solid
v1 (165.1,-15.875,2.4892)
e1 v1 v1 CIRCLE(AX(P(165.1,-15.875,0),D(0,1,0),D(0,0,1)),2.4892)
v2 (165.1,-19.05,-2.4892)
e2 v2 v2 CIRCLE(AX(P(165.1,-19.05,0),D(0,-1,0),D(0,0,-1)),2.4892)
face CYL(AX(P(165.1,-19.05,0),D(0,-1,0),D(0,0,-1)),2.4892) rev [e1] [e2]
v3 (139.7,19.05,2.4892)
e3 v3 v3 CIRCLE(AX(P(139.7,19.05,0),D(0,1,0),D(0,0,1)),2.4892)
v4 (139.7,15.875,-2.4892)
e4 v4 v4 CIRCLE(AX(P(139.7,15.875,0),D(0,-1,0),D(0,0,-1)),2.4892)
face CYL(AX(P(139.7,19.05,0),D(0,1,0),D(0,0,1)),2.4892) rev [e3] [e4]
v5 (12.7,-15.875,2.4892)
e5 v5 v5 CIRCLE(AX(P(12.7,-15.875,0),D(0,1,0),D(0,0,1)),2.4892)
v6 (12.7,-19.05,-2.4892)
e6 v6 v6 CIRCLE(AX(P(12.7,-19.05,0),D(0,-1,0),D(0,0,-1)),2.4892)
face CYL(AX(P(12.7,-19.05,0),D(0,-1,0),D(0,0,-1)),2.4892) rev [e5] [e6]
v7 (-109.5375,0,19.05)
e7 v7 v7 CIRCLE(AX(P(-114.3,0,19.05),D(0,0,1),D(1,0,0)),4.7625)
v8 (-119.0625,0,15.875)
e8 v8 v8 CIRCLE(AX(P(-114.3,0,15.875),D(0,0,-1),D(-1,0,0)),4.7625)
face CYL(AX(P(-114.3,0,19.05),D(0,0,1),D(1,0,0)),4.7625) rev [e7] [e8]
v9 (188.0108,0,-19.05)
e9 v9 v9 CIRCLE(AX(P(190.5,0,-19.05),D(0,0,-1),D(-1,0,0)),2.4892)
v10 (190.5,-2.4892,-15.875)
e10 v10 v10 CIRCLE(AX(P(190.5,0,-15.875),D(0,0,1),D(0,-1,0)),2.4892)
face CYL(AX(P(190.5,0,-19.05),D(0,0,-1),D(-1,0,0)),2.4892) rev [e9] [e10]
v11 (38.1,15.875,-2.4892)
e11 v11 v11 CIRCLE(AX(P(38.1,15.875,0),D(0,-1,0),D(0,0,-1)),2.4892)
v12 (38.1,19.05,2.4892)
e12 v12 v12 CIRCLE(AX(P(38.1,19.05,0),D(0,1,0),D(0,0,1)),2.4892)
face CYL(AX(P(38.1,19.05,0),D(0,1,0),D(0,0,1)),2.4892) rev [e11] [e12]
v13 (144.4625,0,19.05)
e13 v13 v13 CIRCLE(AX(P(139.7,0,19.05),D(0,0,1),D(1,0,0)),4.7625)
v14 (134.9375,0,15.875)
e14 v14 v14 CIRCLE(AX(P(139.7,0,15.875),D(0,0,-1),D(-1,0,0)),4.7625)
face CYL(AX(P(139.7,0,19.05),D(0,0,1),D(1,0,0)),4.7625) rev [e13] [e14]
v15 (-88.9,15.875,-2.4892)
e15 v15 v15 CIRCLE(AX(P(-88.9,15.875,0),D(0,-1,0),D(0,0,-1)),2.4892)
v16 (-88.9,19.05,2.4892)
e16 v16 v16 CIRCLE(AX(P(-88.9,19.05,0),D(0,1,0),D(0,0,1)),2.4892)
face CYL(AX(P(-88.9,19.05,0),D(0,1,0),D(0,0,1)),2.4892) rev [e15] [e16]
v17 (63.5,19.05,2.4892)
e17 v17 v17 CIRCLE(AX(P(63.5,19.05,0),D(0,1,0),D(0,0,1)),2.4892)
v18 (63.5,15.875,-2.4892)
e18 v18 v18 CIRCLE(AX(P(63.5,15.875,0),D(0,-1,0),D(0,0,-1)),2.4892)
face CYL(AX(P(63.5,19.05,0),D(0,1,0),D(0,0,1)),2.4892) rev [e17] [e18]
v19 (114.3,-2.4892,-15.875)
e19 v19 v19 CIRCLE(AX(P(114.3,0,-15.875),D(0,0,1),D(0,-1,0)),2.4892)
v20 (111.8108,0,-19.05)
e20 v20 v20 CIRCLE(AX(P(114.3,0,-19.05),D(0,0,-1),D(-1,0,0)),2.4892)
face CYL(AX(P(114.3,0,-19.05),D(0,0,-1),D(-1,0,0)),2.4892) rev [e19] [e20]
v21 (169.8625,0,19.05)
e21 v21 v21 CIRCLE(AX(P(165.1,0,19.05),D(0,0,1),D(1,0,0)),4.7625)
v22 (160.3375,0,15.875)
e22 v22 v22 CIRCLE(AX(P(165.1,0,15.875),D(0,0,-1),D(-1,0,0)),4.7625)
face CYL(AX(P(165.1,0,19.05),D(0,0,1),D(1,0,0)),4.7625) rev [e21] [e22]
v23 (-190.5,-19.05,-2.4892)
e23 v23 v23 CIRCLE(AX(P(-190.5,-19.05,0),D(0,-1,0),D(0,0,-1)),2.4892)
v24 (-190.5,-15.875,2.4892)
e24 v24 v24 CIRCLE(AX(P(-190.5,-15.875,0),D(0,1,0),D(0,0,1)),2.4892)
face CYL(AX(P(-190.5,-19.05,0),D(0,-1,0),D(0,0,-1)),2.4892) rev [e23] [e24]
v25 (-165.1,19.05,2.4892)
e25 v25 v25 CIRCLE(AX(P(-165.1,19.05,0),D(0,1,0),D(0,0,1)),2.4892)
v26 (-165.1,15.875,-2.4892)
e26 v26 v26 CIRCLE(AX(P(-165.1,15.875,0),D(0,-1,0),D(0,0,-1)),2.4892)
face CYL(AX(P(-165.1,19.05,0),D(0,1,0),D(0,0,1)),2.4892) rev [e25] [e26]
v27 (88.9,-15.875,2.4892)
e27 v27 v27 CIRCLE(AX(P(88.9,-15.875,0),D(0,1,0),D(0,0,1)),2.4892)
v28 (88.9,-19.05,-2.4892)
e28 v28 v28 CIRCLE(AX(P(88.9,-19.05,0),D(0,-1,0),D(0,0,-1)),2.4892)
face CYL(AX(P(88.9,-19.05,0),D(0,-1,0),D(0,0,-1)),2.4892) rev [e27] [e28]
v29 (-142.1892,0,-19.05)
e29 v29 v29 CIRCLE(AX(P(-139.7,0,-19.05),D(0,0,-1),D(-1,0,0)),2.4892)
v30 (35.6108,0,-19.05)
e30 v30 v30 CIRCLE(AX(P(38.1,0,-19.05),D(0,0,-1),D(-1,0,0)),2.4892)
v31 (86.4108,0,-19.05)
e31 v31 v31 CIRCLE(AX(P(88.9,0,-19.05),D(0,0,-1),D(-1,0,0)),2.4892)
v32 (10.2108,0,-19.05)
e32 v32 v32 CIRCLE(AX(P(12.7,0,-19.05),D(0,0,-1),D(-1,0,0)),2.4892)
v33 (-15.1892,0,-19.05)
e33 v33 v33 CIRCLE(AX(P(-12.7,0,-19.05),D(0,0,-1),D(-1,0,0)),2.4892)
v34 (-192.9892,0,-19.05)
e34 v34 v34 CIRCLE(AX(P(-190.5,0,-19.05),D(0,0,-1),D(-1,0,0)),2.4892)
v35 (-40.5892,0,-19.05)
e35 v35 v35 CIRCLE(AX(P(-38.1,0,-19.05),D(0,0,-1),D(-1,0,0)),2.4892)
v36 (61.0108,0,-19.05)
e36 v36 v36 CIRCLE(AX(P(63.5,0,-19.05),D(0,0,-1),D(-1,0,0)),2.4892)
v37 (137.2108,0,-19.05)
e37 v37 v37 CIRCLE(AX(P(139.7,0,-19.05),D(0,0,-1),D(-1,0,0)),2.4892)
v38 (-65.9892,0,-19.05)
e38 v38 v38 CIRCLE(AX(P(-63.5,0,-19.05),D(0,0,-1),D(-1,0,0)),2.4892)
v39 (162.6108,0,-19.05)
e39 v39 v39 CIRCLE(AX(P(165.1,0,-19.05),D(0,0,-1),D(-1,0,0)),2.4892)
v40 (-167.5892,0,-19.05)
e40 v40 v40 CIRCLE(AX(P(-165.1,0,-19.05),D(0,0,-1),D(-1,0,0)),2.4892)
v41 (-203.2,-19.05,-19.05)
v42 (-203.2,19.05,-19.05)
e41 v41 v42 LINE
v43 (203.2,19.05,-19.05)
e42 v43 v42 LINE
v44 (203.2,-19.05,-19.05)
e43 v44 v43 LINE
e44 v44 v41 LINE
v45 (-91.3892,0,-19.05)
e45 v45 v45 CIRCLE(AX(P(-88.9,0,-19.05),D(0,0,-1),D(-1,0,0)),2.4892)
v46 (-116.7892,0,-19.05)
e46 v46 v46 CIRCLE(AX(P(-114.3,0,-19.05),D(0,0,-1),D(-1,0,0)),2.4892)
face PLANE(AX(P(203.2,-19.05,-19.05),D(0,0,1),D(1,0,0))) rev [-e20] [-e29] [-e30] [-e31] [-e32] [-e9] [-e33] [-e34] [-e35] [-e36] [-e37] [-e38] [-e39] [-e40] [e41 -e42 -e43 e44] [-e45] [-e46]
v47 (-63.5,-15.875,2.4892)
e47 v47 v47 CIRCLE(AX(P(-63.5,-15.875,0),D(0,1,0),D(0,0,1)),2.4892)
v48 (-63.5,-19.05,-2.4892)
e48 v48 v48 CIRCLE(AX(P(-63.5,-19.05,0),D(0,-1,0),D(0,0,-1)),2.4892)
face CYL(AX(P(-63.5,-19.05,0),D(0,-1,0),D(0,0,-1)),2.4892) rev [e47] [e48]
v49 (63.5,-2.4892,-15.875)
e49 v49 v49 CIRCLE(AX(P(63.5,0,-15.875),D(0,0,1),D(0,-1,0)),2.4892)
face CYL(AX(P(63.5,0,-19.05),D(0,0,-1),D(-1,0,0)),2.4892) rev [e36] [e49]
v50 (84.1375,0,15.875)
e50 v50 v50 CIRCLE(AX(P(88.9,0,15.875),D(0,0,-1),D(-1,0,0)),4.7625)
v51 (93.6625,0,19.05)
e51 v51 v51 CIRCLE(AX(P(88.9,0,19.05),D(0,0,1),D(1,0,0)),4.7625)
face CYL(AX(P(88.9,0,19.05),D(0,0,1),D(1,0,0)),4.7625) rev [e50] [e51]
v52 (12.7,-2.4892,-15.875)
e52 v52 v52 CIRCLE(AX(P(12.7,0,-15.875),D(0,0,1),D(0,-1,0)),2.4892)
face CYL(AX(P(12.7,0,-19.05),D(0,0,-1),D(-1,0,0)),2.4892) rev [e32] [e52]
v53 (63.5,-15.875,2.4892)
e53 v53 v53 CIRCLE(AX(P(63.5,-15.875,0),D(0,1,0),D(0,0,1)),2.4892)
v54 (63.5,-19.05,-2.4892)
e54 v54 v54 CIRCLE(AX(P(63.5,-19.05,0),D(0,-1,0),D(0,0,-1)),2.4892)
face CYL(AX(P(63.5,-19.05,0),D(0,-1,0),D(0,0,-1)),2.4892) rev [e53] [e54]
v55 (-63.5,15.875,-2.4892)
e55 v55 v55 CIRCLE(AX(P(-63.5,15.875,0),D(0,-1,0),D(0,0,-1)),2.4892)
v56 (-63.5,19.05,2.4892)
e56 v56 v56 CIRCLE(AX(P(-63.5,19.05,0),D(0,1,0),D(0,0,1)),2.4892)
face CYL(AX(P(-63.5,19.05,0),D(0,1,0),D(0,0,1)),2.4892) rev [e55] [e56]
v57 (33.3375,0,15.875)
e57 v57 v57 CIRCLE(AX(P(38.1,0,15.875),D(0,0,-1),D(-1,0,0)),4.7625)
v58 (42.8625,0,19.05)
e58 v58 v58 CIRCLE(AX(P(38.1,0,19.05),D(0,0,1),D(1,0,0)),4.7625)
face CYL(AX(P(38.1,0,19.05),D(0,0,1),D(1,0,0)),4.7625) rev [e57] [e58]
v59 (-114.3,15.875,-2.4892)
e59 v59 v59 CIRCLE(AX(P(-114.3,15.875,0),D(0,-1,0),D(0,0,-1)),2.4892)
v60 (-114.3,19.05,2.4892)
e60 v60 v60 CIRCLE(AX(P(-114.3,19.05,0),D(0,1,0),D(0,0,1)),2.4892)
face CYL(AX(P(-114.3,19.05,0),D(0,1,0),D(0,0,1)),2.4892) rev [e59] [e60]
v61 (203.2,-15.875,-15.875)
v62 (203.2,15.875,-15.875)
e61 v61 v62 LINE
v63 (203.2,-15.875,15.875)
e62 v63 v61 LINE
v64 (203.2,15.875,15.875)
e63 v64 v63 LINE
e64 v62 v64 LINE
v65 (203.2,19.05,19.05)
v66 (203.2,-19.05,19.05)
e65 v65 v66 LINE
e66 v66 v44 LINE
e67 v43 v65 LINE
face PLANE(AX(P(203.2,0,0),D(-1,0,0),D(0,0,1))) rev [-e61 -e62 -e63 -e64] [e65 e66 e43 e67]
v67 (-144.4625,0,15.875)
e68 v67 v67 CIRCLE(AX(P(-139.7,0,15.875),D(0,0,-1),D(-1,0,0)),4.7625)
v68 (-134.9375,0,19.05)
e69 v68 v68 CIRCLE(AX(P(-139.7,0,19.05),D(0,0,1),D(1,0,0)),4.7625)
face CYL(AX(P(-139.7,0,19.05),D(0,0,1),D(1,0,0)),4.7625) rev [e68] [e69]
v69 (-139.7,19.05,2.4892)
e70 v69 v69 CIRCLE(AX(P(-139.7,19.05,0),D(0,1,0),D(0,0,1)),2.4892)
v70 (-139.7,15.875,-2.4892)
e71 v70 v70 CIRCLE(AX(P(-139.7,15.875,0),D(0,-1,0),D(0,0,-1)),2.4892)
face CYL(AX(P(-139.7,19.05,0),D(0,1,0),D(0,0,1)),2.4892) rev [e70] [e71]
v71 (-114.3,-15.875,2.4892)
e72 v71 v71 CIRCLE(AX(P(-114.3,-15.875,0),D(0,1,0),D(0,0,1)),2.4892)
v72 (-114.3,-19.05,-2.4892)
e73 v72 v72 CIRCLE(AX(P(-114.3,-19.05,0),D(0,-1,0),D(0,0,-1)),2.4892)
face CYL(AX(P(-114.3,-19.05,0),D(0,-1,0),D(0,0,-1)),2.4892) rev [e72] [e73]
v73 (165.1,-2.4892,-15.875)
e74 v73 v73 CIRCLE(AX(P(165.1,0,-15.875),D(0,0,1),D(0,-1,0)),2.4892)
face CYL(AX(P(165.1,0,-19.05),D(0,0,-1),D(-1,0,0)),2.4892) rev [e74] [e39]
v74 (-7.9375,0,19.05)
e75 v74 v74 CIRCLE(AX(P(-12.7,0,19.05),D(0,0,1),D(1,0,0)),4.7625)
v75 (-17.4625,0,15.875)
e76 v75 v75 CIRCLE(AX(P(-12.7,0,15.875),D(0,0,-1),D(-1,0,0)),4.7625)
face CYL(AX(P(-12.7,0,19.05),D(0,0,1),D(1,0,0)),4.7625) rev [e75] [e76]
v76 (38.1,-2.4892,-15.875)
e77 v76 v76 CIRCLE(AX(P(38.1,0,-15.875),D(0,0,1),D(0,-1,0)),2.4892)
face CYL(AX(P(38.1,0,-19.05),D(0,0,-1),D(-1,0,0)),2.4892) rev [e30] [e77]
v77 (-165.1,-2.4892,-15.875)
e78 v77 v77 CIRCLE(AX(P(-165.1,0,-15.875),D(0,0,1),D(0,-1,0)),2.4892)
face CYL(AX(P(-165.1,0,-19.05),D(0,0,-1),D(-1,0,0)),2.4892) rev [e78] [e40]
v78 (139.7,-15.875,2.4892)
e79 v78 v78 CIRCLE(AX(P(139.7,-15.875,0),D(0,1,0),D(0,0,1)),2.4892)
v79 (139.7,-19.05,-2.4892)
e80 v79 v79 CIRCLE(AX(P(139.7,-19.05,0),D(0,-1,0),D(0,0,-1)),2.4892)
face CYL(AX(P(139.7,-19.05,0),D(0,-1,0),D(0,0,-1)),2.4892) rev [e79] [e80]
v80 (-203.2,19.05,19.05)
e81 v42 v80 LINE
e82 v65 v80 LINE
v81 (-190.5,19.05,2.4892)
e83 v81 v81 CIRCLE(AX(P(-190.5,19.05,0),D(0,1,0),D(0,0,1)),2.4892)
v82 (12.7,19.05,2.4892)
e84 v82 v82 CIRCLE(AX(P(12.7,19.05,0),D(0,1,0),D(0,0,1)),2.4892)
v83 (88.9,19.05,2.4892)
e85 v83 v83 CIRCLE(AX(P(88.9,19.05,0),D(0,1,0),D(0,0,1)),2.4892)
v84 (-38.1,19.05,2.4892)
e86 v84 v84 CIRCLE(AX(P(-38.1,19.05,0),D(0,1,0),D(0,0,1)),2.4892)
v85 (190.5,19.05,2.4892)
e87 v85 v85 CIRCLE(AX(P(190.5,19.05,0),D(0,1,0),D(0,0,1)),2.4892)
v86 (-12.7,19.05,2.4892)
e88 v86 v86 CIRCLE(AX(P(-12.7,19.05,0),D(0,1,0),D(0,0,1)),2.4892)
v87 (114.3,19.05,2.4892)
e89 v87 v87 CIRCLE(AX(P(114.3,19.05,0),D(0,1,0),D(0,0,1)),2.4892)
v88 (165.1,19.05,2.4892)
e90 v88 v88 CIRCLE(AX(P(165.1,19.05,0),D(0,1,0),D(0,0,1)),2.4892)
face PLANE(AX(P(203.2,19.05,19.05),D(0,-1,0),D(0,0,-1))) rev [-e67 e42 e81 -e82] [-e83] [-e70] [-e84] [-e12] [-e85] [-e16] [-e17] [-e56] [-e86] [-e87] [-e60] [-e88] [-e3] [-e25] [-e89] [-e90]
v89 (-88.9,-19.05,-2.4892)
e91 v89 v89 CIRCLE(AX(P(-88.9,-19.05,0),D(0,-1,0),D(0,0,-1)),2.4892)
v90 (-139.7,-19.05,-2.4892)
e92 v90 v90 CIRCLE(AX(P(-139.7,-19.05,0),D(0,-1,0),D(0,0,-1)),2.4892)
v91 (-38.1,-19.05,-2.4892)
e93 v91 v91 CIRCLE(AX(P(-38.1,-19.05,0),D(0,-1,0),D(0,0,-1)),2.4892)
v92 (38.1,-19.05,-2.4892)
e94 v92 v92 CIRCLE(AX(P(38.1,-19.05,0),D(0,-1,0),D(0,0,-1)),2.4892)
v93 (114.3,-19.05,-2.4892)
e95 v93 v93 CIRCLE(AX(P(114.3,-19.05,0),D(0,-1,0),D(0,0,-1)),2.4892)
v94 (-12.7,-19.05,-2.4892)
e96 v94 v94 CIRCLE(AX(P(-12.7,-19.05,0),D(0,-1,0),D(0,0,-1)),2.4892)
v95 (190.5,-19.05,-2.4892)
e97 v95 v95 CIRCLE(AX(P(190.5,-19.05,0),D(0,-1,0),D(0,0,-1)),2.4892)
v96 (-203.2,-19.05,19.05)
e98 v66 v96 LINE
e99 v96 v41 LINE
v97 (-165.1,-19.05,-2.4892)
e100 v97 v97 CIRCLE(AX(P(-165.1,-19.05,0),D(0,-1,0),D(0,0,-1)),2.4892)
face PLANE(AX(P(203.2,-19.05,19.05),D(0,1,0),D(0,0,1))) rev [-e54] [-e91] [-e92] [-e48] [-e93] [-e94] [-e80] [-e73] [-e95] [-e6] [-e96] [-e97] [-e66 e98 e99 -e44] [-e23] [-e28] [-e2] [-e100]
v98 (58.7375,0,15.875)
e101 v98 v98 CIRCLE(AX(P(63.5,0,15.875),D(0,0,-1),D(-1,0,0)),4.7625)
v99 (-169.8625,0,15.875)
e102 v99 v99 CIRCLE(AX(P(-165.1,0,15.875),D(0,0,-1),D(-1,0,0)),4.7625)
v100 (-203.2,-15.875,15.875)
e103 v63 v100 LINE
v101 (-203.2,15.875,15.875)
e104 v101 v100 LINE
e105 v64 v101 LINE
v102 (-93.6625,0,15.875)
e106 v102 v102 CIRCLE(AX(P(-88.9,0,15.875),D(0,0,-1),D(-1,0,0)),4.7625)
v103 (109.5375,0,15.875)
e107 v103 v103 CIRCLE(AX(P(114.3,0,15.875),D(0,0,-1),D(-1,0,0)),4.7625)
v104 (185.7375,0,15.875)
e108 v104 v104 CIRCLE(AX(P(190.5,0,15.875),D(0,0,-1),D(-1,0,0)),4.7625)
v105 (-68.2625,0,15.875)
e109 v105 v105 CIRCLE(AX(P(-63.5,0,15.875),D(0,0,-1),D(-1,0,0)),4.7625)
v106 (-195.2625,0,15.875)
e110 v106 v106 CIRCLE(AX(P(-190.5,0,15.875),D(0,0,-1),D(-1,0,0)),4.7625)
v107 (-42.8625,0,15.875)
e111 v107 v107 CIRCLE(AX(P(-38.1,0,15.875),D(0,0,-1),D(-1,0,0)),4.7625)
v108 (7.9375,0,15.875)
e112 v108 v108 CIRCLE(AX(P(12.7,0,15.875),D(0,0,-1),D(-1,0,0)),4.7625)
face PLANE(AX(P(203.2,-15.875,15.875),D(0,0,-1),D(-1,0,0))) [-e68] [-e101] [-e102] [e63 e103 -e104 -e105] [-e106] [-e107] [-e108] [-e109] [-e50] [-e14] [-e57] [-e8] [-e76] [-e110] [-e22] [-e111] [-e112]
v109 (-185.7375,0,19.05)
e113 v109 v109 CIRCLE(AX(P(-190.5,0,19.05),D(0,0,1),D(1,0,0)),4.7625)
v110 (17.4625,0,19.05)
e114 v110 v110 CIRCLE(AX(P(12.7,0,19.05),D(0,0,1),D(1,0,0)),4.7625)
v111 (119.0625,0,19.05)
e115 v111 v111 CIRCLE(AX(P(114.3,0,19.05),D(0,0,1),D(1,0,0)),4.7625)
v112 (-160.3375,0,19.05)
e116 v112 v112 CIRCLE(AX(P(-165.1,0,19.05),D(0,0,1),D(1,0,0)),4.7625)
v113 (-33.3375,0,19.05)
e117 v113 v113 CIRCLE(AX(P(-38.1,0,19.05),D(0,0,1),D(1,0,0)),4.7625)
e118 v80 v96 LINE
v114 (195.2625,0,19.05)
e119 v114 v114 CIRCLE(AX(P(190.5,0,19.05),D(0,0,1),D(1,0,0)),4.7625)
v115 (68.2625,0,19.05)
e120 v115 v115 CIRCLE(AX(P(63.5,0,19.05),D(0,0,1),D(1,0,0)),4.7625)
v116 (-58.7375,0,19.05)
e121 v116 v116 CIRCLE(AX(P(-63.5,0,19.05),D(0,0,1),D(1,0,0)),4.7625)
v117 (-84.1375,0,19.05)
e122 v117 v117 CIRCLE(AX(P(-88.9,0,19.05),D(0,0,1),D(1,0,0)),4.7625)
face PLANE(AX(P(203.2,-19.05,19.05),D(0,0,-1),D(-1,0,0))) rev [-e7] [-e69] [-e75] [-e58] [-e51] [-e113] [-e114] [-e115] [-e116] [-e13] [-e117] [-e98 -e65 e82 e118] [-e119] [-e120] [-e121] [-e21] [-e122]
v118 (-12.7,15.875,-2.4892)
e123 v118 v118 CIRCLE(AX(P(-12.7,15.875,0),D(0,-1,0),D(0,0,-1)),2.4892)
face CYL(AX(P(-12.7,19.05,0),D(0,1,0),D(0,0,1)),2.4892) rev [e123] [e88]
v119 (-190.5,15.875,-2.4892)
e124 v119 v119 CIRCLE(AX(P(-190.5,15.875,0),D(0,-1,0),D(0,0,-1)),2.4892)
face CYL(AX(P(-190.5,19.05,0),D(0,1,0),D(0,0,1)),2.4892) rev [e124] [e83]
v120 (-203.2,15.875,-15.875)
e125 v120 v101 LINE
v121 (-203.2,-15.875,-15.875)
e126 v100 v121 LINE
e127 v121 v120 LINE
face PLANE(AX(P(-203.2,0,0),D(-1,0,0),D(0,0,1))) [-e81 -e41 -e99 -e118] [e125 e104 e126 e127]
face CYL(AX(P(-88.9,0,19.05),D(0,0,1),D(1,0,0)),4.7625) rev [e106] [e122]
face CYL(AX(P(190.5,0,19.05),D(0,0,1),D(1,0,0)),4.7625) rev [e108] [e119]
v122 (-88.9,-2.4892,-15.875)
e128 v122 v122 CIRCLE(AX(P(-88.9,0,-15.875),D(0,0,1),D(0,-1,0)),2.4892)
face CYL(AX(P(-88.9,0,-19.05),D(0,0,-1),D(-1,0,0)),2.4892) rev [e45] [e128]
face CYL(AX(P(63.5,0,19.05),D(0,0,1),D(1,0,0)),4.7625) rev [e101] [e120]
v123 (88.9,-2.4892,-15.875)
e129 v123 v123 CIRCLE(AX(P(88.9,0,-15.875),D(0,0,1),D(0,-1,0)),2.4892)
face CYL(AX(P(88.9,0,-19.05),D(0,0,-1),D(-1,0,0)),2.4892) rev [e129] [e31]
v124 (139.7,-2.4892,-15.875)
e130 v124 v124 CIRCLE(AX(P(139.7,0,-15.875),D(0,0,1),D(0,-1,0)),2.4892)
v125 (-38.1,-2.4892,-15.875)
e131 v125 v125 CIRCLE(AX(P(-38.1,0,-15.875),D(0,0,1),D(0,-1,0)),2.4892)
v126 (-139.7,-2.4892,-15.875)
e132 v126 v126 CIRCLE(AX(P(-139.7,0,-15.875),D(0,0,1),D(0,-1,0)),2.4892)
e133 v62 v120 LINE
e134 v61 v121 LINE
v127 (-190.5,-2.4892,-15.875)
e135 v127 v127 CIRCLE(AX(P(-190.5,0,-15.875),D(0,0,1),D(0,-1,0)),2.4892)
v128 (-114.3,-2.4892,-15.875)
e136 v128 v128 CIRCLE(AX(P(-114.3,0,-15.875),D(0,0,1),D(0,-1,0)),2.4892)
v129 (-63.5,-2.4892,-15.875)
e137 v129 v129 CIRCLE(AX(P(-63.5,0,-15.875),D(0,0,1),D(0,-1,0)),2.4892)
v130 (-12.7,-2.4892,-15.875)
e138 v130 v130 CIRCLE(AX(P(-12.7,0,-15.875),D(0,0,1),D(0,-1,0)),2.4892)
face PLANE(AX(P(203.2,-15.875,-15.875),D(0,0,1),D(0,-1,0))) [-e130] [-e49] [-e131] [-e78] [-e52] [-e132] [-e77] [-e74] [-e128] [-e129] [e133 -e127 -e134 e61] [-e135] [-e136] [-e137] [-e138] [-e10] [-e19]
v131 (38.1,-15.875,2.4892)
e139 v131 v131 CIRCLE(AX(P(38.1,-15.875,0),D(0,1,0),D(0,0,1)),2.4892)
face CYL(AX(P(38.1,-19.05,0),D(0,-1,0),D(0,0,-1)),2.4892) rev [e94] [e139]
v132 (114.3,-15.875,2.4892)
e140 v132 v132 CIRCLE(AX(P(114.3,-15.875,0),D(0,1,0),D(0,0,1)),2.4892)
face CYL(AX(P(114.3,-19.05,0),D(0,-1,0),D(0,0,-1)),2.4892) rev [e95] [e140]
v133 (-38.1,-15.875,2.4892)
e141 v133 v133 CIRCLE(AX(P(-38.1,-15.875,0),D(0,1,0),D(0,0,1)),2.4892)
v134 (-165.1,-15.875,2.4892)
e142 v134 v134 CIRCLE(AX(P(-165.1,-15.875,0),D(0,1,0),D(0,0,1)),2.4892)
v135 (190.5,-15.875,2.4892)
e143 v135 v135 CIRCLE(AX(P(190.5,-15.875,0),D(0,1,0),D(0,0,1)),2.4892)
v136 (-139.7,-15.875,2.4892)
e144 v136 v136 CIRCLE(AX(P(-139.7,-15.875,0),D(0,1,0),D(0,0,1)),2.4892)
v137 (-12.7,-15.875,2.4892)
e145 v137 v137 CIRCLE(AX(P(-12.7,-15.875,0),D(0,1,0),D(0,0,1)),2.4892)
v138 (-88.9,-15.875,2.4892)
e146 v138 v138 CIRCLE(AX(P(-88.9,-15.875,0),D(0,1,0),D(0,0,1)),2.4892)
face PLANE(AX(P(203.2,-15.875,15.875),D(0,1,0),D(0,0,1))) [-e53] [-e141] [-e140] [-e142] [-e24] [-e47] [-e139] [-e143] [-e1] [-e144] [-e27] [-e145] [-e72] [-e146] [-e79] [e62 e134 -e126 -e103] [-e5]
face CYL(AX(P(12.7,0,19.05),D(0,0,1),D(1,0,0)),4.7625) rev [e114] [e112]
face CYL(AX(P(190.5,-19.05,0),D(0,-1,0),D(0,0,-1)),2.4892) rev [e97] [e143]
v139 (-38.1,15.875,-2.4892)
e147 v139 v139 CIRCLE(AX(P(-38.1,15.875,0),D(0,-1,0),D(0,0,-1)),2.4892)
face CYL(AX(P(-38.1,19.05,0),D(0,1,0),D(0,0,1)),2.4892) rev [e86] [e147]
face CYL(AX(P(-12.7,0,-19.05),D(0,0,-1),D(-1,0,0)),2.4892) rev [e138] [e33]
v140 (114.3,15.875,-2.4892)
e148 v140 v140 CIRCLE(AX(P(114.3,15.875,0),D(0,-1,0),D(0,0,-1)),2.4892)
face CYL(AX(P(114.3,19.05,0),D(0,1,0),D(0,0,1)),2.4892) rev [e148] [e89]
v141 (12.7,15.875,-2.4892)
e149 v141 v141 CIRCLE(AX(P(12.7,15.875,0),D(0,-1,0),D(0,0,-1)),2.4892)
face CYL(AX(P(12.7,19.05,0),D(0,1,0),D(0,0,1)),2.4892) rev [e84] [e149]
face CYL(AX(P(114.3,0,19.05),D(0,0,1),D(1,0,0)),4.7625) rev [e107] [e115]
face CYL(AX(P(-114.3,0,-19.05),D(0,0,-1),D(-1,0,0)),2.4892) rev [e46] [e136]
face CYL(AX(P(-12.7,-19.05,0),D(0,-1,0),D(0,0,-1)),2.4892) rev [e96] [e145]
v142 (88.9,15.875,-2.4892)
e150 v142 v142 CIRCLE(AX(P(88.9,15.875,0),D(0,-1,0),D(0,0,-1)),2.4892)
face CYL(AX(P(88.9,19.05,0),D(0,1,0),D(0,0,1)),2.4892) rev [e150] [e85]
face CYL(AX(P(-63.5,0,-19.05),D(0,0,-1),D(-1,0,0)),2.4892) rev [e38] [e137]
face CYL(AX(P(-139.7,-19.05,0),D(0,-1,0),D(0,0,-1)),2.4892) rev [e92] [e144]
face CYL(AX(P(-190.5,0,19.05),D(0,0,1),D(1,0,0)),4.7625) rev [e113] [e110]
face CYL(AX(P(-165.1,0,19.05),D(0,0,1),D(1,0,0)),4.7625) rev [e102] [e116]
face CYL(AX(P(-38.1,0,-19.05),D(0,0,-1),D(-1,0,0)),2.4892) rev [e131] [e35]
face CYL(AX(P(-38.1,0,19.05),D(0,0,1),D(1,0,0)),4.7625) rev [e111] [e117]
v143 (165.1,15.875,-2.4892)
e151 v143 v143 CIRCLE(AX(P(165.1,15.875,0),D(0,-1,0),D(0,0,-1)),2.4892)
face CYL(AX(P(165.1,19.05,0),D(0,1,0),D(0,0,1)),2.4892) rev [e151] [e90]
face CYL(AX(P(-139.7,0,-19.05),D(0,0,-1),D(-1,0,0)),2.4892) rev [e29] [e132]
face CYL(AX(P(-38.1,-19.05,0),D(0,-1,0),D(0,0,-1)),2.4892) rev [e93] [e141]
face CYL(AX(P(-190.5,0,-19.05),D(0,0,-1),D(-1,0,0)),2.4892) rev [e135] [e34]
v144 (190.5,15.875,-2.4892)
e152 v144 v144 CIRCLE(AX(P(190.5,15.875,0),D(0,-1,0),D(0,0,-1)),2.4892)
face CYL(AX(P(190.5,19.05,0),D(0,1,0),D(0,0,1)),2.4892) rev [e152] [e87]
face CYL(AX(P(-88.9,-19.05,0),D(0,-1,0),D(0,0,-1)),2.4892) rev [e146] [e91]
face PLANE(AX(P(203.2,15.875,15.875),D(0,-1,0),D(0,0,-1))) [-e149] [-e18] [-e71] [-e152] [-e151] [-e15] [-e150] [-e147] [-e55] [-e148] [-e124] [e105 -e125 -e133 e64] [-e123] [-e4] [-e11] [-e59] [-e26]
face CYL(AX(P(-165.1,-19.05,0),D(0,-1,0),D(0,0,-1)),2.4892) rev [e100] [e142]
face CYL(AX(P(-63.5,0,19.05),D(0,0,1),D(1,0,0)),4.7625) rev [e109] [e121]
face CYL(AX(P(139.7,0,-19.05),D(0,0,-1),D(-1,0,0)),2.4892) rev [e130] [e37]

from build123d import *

# Parameters (mm, degrees)
SKETCH1_W                        = 38.1
SKETCH1_H                        = 38.1
SKETCH1_W_2                      = 31.75
SKETCH1_H_2                      = 31.75
BOSS_EXTRUDE1_DEPTH              = 203.2
SKETCH3_W                        = 2.4892
SKETCH3_H                        = 3.175
SKETCH3_AT_POINT_2_W             = 2.4892
SKETCH3_AT_POINT_2_H             = 3.175
SKETCH3_AT_POINT_3_W             = 2.4892
SKETCH3_AT_POINT_3_H             = 3.175
F_3_8_0_375_DIAMETER_HOLE1_D     = 9.525
F_3_8_0_375_DIAMETER_HOLE1_DEPTH = 3.175
LPATTERN1_START                  = 15.875
LPATTERN1_OUTLINE_R              = 4.7625
LPATTERN1_DEPTH                  = 3.175
LPATTERN1_START_2                = -19.05
LPATTERN1_2_OUTLINE_R            = 2.4892
LPATTERN1_2_DEPTH                = 3.175
LPATTERN1_3_OUTLINE_R            = 2.4892
LPATTERN1_3_DEPTH                = 38.1


# Read off the part's stored shape, not the designer's step: LPattern1
with BuildPart() as part:
    # Sketch1 → Boss-Extrude1 (new, symmetric)
    with BuildSketch(Plane(origin=(0, 0, 0), x_dir=(0, 0, -1), z_dir=(1, 0, 0))):
        Rectangle(SKETCH1_W, SKETCH1_H)
        Rectangle(SKETCH1_W_2, SKETCH1_H_2, mode=Mode.SUBTRACT)
    extrude(amount=BOSS_EXTRUDE1_DEPTH, both=True)

    # Sketch3 → #9 (0.196) Diameter Hole1 (revolve, cut)
    with BuildSketch(Plane(origin=(190.5, 19.05, 0), x_dir=(0, 0, 1), z_dir=(1, 0, 0))):
        with Locations((1.2446, 1.5875)):
            Rectangle(SKETCH3_W, SKETCH3_H)
    revolve(axis=Axis((190.5, 25.4, 0), (0, -1, 0)), mode=Mode.SUBTRACT)

    # Sketch3 at point 2 (carried to point 2, square into its face) → #9 (0.196) Diameter Hole1 at 2 (revolve, cut)
    with BuildSketch(Plane(origin=(190.5, -19.05, 0), x_dir=(0, 0, 1), z_dir=(-1, 0, 0))):
        with Locations((1.2446, 1.5875)):
            Rectangle(SKETCH3_AT_POINT_2_W, SKETCH3_AT_POINT_2_H)
    revolve(axis=Axis((190.5, -25.4, 0), (0, 1, 0)), mode=Mode.SUBTRACT)

    # Sketch3 at point 3 (carried to point 3, square into its face) → #9 (0.196) Diameter Hole1 at 3 (revolve, cut)
    with BuildSketch(Plane(origin=(190.5, 0, -19.05), x_dir=(0, 1, 0), z_dir=(1, 0, 0))):
        with Locations((1.2446, 1.5875)):
            Rectangle(SKETCH3_AT_POINT_3_W, SKETCH3_AT_POINT_3_H)
    revolve(axis=Axis((190.5, 0, -25.4), (0, 0, 1)), mode=Mode.SUBTRACT)

    # 3/8 (0.375) Diameter Hole1
    with Locations(Plane(origin=(190.5, 0, 19.05), x_dir=(1, 0, 0), z_dir=(0, 0, 1))):
        with Locations((0, 0)):
            Hole(F_3_8_0_375_DIAMETER_HOLE1_D / 2, depth=F_3_8_0_375_DIAMETER_HOLE1_DEPTH)

    # LPattern1 outline → LPattern1 (cut)
    with BuildSketch(Plane.XY.offset(LPATTERN1_START)):
        with Locations((165.1, 0)):
            Circle(LPATTERN1_OUTLINE_R)
        with Locations((139.7, 0)):
            Circle(LPATTERN1_OUTLINE_R)
        with Locations((114.3, 0)):
            Circle(LPATTERN1_OUTLINE_R)
        with Locations((88.9, 0)):
            Circle(LPATTERN1_OUTLINE_R)
        with Locations((63.5, 0)):
            Circle(LPATTERN1_OUTLINE_R)
        with Locations((38.1, 0)):
            Circle(LPATTERN1_OUTLINE_R)
        with Locations((12.7, 0)):
            Circle(LPATTERN1_OUTLINE_R)
        with Locations((-12.7, 0)):
            Circle(LPATTERN1_OUTLINE_R)
        with Locations((-38.1, 0)):
            Circle(LPATTERN1_OUTLINE_R)
        with Locations((-63.5, 0)):
            Circle(LPATTERN1_OUTLINE_R)
        with Locations((-88.9, 0)):
            Circle(LPATTERN1_OUTLINE_R)
        with Locations((-114.3, 0)):
            Circle(LPATTERN1_OUTLINE_R)
        with Locations((-139.7, 0)):
            Circle(LPATTERN1_OUTLINE_R)
        with Locations((-165.1, 0)):
            Circle(LPATTERN1_OUTLINE_R)
        with Locations((-190.5, 0)):
            Circle(LPATTERN1_OUTLINE_R)
    extrude(amount=LPATTERN1_DEPTH, mode=Mode.SUBTRACT)

    # LPattern1 2 outline → LPattern1 2 (cut)
    with BuildSketch(Plane.XY.offset(LPATTERN1_START_2)):
        with Locations((165.1, 0)):
            Circle(LPATTERN1_2_OUTLINE_R)
        with Locations((139.7, 0)):
            Circle(LPATTERN1_2_OUTLINE_R)
        with Locations((114.3, 0)):
            Circle(LPATTERN1_2_OUTLINE_R)
        with Locations((88.9, 0)):
            Circle(LPATTERN1_2_OUTLINE_R)
        with Locations((63.5, 0)):
            Circle(LPATTERN1_2_OUTLINE_R)
        with Locations((38.1, 0)):
            Circle(LPATTERN1_2_OUTLINE_R)
        with Locations((12.7, 0)):
            Circle(LPATTERN1_2_OUTLINE_R)
        with Locations((-12.7, 0)):
            Circle(LPATTERN1_2_OUTLINE_R)
        with Locations((-38.1, 0)):
            Circle(LPATTERN1_2_OUTLINE_R)
        with Locations((-63.5, 0)):
            Circle(LPATTERN1_2_OUTLINE_R)
        with Locations((-88.9, 0)):
            Circle(LPATTERN1_2_OUTLINE_R)
        with Locations((-114.3, 0)):
            Circle(LPATTERN1_2_OUTLINE_R)
        with Locations((-139.7, 0)):
            Circle(LPATTERN1_2_OUTLINE_R)
        with Locations((-165.1, 0)):
            Circle(LPATTERN1_2_OUTLINE_R)
        with Locations((-190.5, 0)):
            Circle(LPATTERN1_2_OUTLINE_R)
    extrude(amount=LPATTERN1_2_DEPTH, mode=Mode.SUBTRACT)

    # LPattern1 3 outline → LPattern1 3 (cut)
    with BuildSketch(Plane(origin=(0, 0, 0), x_dir=(1, 0, 0), z_dir=(0, 1, 0)).offset(LPATTERN1_START_2)):
        with Locations((165.1, 0)):
            Circle(LPATTERN1_3_OUTLINE_R)
        with Locations((139.7, 0)):
            Circle(LPATTERN1_3_OUTLINE_R)
        with Locations((114.3, 0)):
            Circle(LPATTERN1_3_OUTLINE_R)
        with Locations((88.9, 0)):
            Circle(LPATTERN1_3_OUTLINE_R)
        with Locations((63.5, 0)):
            Circle(LPATTERN1_3_OUTLINE_R)
        with Locations((38.1, 0)):
            Circle(LPATTERN1_3_OUTLINE_R)
        with Locations((12.7, 0)):
            Circle(LPATTERN1_3_OUTLINE_R)
        with Locations((-12.7, 0)):
            Circle(LPATTERN1_3_OUTLINE_R)
        with Locations((-38.1, 0)):
            Circle(LPATTERN1_3_OUTLINE_R)
        with Locations((-63.5, 0)):
            Circle(LPATTERN1_3_OUTLINE_R)
        with Locations((-88.9, 0)):
            Circle(LPATTERN1_3_OUTLINE_R)
        with Locations((-114.3, 0)):
            Circle(LPATTERN1_3_OUTLINE_R)
        with Locations((-139.7, 0)):
            Circle(LPATTERN1_3_OUTLINE_R)
        with Locations((-165.1, 0)):
            Circle(LPATTERN1_3_OUTLINE_R)
        with Locations((-190.5, 0)):
            Circle(LPATTERN1_3_OUTLINE_R)
    extrude(amount=LPATTERN1_3_DEPTH, mode=Mode.SUBTRACT)


solid = part.part
